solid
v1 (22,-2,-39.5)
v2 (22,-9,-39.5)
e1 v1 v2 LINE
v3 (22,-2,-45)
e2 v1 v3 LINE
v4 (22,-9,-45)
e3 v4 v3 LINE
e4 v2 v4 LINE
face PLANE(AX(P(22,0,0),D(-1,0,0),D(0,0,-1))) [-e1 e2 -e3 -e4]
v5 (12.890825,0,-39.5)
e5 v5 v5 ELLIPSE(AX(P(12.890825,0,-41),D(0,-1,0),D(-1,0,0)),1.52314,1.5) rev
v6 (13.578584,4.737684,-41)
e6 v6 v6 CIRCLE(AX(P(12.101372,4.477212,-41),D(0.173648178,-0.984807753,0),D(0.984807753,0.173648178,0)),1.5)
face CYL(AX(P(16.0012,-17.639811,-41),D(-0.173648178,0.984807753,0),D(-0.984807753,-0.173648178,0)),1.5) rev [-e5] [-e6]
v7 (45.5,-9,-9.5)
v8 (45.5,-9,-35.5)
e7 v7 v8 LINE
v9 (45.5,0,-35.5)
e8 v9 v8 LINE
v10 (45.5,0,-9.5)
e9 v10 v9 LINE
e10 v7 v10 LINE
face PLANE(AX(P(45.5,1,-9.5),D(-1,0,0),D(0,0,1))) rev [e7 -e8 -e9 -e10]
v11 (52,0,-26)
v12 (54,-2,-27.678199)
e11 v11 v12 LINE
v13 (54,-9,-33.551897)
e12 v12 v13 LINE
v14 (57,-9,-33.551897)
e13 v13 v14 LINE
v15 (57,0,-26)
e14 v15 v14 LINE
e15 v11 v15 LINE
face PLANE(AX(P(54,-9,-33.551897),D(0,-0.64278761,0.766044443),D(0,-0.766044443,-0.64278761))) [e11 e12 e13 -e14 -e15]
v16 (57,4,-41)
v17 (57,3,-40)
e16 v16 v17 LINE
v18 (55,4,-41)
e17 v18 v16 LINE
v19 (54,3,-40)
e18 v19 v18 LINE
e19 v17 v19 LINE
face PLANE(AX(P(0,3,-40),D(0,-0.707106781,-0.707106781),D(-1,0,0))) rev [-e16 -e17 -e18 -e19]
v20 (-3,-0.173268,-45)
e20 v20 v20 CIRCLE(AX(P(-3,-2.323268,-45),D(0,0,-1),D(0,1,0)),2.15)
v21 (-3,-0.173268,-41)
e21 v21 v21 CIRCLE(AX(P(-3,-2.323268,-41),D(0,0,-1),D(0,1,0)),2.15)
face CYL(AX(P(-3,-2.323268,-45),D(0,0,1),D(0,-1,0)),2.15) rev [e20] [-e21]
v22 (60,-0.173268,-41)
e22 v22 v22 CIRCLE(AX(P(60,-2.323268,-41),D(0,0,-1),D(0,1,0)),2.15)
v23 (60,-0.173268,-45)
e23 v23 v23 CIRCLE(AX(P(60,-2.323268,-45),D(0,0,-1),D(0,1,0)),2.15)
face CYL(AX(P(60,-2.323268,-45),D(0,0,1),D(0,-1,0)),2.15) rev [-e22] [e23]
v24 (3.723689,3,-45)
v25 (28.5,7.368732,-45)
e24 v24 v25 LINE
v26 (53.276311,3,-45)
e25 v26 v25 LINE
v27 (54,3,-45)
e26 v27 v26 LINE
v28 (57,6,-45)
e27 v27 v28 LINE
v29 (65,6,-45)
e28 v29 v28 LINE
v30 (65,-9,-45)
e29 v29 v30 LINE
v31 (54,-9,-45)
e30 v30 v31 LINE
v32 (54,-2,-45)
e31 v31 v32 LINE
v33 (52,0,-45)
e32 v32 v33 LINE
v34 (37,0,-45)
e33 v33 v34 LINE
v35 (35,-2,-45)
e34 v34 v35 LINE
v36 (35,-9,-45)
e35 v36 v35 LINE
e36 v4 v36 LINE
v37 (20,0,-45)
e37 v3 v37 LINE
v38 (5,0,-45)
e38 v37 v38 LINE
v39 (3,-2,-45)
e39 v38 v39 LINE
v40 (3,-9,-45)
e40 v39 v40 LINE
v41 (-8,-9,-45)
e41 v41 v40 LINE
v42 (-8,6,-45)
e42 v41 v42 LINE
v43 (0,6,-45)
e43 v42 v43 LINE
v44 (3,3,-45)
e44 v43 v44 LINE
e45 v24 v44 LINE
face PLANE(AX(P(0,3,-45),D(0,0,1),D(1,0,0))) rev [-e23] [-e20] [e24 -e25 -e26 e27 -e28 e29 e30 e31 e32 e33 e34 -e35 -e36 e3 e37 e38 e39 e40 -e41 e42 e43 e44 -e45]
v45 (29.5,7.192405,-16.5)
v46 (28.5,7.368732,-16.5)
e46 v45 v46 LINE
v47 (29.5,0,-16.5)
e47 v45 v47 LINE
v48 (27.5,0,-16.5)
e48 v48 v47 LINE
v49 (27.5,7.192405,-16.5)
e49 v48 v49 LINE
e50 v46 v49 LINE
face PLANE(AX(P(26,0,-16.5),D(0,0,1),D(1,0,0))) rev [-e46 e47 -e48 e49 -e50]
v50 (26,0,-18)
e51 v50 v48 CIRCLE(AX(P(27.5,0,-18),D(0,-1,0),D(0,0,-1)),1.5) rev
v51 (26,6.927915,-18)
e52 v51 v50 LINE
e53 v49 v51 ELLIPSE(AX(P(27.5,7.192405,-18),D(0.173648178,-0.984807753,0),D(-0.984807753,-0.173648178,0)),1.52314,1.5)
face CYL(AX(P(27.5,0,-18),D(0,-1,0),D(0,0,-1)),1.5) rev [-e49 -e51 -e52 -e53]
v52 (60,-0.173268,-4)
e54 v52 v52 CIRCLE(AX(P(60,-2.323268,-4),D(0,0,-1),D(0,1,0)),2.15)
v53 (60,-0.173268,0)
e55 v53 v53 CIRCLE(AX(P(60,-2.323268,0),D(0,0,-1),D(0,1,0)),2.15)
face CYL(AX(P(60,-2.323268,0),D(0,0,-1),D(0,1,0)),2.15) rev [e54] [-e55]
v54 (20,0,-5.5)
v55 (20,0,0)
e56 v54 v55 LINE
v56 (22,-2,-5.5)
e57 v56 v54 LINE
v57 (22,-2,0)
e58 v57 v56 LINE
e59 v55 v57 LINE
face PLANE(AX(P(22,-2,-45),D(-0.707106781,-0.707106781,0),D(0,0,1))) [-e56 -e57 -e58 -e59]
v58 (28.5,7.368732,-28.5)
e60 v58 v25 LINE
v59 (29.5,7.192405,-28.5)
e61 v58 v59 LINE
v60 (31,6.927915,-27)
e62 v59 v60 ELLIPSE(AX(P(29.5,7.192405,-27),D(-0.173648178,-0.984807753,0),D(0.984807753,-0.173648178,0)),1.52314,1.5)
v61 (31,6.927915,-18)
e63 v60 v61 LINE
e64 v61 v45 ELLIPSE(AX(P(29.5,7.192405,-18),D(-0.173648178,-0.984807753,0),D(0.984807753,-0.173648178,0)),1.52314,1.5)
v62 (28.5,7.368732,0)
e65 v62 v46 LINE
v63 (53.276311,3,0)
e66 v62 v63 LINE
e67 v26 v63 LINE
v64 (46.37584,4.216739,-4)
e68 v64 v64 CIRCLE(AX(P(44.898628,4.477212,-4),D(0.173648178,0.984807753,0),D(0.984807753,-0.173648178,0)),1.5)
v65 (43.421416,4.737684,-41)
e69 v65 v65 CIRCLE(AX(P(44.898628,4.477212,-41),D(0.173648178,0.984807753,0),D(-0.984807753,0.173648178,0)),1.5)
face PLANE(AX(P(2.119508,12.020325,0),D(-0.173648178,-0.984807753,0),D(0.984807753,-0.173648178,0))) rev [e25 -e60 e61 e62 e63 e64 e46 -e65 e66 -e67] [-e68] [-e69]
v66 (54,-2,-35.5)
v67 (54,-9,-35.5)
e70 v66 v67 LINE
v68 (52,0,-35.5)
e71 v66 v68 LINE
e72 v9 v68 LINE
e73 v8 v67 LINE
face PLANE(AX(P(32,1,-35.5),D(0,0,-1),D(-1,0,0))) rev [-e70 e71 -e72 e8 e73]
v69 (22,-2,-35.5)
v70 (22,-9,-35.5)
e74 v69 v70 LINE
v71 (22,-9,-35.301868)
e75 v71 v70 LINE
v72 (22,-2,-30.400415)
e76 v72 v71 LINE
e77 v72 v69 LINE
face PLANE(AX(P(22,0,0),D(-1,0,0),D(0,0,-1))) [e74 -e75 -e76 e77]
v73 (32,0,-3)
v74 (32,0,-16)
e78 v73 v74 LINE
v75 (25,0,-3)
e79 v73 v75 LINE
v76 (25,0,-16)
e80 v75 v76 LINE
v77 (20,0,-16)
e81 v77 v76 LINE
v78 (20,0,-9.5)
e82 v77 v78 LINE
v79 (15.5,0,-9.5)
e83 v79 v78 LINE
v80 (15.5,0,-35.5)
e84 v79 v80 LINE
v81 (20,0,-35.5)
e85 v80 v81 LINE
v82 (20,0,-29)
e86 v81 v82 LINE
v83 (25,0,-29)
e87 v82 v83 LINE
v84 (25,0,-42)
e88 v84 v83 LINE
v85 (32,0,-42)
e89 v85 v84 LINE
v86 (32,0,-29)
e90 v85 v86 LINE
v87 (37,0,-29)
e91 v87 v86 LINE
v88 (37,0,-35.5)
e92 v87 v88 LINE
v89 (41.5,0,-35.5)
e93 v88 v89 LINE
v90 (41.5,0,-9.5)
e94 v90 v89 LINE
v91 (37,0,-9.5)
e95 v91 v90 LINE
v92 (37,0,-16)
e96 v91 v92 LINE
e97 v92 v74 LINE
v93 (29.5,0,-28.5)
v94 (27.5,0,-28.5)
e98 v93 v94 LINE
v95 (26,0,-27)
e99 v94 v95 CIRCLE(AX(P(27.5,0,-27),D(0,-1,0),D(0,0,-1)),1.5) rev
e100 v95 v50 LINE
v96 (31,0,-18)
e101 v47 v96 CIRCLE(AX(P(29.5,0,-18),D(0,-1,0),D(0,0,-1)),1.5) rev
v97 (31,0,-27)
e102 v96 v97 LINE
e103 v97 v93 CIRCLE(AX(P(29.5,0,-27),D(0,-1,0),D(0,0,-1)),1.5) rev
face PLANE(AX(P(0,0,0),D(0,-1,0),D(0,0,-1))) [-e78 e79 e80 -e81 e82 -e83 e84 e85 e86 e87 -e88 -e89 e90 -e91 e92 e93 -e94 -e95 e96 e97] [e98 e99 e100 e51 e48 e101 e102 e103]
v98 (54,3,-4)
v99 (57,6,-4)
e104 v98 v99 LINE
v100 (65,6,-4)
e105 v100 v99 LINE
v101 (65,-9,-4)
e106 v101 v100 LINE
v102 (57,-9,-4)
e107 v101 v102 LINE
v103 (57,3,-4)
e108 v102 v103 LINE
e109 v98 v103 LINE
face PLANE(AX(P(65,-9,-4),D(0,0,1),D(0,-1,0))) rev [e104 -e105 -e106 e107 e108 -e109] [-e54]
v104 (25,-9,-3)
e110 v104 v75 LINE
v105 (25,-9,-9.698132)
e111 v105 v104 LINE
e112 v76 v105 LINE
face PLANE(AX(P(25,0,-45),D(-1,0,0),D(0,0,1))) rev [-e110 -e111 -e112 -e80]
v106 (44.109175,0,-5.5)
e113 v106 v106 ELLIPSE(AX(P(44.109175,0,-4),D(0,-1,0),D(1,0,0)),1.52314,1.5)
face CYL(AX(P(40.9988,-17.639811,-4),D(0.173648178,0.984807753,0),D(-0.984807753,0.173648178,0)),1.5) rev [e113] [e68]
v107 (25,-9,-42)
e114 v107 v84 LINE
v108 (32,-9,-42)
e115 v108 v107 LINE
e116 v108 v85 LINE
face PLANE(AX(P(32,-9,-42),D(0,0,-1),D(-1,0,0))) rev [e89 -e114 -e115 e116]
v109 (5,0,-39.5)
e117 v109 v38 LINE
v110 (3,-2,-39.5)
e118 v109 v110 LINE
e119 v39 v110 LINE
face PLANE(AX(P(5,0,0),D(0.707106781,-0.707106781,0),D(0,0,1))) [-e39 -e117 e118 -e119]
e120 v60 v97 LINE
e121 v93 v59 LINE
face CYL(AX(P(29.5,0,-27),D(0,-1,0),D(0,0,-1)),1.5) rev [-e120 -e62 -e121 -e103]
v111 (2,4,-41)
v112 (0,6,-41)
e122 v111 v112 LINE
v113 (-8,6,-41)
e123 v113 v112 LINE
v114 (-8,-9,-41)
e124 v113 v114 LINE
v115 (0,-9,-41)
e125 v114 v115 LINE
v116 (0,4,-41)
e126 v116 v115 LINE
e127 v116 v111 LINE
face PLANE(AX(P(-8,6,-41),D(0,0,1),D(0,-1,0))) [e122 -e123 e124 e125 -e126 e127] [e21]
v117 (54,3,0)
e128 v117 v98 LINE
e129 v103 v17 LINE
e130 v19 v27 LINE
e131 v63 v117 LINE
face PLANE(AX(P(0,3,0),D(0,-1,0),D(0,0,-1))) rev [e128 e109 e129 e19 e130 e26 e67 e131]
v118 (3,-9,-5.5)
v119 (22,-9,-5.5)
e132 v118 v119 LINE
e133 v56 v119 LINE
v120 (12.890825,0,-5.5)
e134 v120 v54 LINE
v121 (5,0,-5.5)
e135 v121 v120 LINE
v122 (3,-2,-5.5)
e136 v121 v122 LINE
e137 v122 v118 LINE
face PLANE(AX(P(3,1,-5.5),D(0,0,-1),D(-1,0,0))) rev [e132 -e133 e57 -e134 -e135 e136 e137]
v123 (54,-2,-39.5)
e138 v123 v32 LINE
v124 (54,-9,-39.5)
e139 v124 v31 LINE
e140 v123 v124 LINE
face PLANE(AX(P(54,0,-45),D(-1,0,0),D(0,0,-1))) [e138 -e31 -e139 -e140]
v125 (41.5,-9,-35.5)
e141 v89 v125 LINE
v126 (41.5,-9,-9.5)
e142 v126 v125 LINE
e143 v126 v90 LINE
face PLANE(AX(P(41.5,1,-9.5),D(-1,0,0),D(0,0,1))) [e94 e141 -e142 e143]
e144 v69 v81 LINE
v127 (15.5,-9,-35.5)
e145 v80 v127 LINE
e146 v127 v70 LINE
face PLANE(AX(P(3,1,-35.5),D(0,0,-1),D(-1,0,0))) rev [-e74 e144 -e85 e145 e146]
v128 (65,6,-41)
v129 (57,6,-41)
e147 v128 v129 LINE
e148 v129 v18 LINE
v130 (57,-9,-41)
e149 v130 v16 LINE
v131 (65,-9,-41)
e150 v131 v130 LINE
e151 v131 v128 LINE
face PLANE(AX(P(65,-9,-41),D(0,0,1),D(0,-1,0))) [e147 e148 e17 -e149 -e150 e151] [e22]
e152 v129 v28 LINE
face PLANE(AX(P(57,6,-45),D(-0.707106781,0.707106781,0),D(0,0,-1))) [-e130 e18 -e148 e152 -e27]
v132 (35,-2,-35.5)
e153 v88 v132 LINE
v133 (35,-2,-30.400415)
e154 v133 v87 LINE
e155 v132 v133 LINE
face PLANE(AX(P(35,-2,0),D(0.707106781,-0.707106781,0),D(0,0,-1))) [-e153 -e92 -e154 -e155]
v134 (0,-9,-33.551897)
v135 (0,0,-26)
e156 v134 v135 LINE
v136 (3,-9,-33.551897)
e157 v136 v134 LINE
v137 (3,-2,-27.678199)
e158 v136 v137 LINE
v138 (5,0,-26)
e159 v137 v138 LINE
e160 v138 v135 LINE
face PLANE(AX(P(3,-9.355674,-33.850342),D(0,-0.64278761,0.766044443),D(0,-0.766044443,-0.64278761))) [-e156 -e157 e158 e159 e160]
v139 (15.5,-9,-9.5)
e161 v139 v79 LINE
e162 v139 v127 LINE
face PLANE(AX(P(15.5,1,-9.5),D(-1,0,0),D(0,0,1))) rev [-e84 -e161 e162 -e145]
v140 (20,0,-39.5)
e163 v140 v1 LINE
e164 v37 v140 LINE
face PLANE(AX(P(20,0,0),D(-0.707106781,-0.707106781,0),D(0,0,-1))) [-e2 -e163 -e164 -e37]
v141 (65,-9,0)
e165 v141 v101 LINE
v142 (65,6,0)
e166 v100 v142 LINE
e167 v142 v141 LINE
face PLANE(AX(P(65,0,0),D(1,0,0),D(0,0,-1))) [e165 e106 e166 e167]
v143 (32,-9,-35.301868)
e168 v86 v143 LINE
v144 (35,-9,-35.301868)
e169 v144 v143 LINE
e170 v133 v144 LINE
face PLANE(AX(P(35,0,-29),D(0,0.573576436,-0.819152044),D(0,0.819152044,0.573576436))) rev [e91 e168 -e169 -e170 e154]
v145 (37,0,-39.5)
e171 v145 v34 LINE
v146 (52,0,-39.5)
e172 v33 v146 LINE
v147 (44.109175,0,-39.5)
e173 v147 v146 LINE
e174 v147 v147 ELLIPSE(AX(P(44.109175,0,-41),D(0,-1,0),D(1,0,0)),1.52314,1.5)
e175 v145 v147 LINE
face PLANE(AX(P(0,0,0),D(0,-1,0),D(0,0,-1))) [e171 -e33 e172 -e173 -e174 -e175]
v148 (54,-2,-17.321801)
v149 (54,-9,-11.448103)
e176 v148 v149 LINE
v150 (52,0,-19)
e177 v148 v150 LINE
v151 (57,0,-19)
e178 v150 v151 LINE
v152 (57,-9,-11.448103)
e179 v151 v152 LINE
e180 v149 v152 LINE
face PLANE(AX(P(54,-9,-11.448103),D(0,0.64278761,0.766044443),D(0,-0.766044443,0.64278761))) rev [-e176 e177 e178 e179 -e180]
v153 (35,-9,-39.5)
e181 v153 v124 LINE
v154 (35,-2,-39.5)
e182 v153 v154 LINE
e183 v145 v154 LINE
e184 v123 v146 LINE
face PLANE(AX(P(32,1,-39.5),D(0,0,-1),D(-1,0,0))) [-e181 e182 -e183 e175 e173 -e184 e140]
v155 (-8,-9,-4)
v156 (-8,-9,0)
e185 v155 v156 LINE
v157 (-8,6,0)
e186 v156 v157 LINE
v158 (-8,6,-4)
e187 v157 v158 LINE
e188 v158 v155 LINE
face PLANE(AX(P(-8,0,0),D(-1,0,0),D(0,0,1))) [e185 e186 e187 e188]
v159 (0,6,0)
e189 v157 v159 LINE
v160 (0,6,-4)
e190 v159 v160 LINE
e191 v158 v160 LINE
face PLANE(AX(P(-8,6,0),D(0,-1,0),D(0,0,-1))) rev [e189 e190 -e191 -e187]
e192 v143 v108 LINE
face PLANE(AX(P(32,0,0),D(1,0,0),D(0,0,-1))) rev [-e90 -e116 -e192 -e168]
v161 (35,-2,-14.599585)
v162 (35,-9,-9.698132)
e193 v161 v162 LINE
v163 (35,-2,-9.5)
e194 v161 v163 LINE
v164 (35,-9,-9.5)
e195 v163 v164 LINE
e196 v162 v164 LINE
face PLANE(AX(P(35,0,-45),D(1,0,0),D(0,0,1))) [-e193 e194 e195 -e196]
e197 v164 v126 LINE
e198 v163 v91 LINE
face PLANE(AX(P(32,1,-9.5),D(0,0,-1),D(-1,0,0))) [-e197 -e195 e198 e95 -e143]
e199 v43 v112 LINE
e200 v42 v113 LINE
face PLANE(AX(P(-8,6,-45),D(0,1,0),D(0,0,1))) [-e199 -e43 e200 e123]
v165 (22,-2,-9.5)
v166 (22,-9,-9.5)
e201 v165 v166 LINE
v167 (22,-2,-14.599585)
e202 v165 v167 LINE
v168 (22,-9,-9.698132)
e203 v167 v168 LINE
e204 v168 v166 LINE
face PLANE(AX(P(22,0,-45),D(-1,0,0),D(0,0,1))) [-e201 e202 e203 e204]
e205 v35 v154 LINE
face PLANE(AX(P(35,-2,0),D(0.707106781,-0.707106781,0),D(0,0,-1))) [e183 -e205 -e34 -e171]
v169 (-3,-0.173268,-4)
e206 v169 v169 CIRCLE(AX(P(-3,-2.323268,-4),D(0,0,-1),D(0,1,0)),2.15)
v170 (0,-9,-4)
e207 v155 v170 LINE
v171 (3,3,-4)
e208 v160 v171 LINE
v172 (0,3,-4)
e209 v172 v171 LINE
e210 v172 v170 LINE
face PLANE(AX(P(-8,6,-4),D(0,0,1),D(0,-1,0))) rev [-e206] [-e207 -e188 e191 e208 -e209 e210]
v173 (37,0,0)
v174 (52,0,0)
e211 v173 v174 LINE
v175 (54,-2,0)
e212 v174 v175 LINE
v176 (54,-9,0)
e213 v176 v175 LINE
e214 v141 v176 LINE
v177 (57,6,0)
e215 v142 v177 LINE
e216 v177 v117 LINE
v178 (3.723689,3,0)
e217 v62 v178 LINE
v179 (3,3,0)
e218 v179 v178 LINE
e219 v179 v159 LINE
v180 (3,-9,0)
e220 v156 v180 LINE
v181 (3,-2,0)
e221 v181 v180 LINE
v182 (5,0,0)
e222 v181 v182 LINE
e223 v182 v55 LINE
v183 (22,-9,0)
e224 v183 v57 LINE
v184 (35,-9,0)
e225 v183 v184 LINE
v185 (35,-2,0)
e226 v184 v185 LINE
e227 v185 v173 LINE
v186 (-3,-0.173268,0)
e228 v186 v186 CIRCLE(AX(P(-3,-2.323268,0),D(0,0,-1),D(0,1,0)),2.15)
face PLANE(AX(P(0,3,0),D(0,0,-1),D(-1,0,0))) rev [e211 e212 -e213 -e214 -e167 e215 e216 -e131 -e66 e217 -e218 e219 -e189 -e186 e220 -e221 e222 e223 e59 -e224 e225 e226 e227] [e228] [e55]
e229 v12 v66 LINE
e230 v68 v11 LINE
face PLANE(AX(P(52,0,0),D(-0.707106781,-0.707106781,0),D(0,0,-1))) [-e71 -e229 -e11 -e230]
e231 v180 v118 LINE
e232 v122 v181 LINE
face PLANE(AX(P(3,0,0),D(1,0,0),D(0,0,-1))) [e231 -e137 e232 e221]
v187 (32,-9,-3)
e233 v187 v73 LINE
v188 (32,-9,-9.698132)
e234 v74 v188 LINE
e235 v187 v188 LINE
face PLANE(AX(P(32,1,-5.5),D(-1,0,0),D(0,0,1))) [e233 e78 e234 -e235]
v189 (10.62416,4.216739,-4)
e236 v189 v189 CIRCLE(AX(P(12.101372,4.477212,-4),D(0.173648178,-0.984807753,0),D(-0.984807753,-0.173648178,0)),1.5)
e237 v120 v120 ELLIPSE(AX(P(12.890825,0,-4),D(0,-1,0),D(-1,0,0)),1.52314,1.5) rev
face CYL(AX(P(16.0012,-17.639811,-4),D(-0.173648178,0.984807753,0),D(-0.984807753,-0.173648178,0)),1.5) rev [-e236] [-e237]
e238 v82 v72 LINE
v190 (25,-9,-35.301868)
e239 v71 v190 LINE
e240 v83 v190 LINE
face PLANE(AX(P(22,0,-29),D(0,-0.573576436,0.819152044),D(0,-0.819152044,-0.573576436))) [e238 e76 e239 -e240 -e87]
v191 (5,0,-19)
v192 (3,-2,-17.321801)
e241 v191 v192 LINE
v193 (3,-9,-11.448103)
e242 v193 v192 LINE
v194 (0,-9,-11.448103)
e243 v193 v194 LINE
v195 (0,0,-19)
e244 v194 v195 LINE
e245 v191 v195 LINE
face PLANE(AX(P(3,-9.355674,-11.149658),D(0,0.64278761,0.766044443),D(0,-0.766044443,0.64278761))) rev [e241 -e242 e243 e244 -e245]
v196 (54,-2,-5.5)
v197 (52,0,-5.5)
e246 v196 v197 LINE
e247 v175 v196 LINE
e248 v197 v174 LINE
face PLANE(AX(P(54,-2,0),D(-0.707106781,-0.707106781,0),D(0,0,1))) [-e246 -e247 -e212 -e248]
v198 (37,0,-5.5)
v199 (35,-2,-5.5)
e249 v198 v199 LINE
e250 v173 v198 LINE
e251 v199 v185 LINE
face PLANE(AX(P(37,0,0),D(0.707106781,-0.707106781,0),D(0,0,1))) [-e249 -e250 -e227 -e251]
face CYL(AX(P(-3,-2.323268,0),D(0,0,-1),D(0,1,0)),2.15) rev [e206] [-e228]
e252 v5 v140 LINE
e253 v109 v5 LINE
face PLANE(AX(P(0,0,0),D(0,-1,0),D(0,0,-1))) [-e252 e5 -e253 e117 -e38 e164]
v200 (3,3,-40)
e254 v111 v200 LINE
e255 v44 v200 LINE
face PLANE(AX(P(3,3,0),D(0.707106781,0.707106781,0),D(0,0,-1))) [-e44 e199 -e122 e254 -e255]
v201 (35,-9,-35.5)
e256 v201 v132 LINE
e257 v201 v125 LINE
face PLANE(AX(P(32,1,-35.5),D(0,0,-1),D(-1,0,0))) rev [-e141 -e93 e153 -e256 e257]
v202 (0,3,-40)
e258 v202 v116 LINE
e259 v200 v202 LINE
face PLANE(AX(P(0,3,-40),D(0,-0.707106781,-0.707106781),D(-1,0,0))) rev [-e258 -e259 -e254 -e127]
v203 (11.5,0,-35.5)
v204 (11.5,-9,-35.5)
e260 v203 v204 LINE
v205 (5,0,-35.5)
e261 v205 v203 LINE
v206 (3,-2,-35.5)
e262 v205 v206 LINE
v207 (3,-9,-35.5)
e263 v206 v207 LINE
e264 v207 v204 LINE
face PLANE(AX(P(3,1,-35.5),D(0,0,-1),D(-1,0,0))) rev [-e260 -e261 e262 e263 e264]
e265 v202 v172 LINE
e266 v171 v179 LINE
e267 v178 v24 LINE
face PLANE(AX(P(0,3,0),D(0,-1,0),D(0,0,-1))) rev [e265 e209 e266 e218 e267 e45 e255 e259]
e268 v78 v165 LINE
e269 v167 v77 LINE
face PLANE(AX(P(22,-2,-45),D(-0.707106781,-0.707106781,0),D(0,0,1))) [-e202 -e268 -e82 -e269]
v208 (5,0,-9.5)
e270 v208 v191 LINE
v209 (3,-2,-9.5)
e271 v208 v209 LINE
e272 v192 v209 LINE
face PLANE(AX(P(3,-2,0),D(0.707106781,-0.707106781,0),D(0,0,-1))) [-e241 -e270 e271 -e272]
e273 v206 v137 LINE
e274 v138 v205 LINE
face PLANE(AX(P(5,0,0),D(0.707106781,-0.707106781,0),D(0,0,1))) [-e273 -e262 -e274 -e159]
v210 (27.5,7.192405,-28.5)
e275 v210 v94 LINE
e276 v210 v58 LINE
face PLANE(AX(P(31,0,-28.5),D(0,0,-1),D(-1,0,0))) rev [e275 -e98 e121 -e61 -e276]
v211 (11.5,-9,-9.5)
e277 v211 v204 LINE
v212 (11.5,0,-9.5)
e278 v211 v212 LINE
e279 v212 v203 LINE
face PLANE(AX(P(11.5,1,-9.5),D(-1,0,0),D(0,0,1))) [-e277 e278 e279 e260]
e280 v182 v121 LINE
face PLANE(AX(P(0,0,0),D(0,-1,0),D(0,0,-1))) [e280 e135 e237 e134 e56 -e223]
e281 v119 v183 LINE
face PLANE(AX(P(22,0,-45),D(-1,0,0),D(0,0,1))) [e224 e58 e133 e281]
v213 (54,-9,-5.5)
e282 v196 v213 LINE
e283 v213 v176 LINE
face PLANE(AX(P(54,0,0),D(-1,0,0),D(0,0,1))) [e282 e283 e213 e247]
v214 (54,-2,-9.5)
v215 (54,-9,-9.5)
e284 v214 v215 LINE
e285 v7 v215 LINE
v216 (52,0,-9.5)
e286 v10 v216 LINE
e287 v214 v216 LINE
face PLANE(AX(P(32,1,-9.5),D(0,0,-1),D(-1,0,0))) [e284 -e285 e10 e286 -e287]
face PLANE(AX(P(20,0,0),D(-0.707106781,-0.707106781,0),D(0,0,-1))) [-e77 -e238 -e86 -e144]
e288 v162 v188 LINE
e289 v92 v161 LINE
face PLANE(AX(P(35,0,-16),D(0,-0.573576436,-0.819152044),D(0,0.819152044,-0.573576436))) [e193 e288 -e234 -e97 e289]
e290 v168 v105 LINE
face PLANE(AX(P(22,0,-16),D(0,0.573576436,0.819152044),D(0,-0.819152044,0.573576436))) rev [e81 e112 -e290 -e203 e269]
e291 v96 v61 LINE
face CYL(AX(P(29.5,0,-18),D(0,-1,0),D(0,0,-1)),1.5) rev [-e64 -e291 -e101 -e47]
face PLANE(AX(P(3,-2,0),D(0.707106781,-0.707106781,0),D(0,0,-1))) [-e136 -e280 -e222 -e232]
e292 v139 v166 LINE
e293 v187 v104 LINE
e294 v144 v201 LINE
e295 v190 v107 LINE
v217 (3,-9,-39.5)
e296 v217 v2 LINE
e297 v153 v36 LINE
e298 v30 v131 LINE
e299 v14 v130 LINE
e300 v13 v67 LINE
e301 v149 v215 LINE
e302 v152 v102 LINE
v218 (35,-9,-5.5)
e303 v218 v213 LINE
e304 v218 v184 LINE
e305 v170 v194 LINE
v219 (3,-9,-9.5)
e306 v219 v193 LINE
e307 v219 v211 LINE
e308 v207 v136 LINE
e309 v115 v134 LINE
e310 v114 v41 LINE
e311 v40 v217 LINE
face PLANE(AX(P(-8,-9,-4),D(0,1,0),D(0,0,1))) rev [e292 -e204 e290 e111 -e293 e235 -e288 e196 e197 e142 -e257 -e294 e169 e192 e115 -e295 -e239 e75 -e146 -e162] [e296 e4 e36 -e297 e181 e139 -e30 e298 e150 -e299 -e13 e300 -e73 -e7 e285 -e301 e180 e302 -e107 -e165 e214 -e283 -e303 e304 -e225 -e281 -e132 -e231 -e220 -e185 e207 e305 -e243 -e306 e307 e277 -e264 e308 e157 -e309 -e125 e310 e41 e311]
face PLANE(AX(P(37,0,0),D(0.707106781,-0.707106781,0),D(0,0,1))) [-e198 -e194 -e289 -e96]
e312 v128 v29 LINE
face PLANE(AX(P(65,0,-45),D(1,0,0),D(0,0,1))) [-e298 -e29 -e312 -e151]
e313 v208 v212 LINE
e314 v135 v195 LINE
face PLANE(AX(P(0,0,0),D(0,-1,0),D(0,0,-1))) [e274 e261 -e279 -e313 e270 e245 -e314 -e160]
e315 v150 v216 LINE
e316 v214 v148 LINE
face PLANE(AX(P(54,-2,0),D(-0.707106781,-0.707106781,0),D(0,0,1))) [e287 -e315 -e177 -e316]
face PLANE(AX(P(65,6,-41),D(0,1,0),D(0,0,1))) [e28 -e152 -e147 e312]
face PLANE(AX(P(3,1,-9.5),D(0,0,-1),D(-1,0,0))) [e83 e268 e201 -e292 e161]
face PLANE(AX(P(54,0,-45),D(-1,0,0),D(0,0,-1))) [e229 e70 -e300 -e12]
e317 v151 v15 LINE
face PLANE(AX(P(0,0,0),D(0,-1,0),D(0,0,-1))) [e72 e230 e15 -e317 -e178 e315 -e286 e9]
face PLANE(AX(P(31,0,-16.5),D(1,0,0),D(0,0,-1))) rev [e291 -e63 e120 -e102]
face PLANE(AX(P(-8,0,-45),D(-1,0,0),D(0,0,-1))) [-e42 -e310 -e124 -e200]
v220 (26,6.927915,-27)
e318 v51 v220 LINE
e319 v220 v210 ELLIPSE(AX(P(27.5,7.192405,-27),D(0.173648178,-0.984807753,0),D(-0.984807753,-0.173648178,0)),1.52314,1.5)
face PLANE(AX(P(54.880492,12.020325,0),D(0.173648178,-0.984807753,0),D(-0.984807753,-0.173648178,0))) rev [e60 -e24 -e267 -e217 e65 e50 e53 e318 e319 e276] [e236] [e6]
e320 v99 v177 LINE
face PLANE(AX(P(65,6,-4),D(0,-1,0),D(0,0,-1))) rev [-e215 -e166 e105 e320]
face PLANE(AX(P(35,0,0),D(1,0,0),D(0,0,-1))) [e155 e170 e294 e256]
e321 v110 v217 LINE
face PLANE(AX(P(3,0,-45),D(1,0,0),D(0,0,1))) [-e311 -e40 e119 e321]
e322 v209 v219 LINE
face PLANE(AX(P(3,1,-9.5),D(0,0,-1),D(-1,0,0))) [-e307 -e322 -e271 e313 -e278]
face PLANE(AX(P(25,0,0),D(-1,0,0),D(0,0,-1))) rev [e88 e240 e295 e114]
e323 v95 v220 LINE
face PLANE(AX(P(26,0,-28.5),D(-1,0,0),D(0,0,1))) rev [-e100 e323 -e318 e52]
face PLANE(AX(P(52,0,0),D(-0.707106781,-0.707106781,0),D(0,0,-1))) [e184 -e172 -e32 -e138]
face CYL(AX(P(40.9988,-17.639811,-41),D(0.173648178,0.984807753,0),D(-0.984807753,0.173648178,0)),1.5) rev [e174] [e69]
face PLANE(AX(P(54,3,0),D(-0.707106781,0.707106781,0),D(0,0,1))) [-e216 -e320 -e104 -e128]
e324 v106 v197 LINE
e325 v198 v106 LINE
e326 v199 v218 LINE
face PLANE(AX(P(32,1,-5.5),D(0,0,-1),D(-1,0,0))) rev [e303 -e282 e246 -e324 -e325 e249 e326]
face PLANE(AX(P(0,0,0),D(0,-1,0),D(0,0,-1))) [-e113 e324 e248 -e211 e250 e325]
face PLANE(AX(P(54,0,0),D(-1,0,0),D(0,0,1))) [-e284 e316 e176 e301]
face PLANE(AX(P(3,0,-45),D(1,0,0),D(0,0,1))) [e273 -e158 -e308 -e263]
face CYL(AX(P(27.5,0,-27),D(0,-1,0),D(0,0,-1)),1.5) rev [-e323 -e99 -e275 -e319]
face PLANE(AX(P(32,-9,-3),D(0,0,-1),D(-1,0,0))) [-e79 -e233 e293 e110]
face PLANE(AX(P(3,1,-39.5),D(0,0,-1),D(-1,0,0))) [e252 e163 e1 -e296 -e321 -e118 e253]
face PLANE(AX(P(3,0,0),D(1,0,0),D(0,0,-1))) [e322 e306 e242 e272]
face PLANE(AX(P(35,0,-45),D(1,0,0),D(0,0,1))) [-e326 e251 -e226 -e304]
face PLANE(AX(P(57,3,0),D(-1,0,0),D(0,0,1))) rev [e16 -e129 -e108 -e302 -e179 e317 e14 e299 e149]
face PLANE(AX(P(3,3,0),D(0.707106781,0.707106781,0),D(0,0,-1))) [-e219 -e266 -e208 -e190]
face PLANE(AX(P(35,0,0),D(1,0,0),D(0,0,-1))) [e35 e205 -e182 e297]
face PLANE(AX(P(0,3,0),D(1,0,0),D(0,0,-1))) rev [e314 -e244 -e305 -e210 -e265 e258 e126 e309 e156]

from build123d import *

# Parameters (mm, degrees)
SKETCH_1_W                 = 57
SKETCH_1_H                 = 45
EXTRUDE_1_DEPTH            = 3
SKETCH_2_W                 = 4
SKETCH_2_H                 = 15
EXTRUDE_2_DEPTH            = 8
SKETCH_3_W                 = 4
SKETCH_3_H                 = 15
EXTRUDE_3_DEPTH            = 8
EXTRUDE_4_DEPTH            = 3
EXTRUDE_5_DEPTH            = 3
CHAMFER_1_SIZE             = 3
SKETCH_6_R                 = 2.15
CUT_EXTRUDE_1_DEPTH        = 4
SKETCH_8_W                 = 8
SKETCH_8_H                 = 3
EXTRUDE_6_DEPTH            = 9
EXTRUDE_7_DEPTH            = 3
SKETCH_12_W                = 5
SKETCH_12_H                = 12
CUT_EXTRUDE_4_DEPTH        = 3
FILLET_1_R                 = 1.5
EXTRUDE_9_REACH            = 82.13
SKETCH_15_W                = 45
SKETCH_15_H                = 17.726539555
SKETCH_16_R                = 1.5
CUT_EXTRUDE_5_DEPTH        = 81.129959324
CHAMFER_1_OF_MIRROR_2_SIZE = 3
CHAMFER_2_SIZE             = 1
CHAMFER_3_SIZE             = 2
DELETE_START               = -45
DELETE_FACE_1_DEPTH        = 45
DELETE_FACE_1_2_DEPTH      = 18
DELETE_START_2             = -18
DELETE_FACE_1_3_DEPTH      = 18
DELETE_START_3             = 3
DELETE_FACE_1_4_DEPTH      = 5
SKETCH_20_W                = 22
SKETCH_20_H                = 4
EXTRUDE_2_2_DEPTH          = 10
MIRROR_4_COPY_1_DEPTH      = 3
SKETCH_21_W                = 4
SKETCH_21_H                = 26
EXTRUDE_3_2_DEPTH          = 10
CHAMFER_4_SIZE             = 2


with BuildPart() as part:
    # 草图1 → 凸台-拉伸1 (new body)
    with BuildSketch(Plane(origin=(0, 0, 0), x_dir=(1, 0, 0), z_dir=(0, 1, 0))):
        with Locations((28.5, 22.5)):
            Rectangle(SKETCH_1_W, SKETCH_1_H)
    extrude(amount=EXTRUDE_1_DEPTH)

    # 草图2 → Extrude 2 (add)
    with BuildSketch(Plane.ZY):
        with Locations((-2, -1.5)):
            Rectangle(SKETCH_2_W, SKETCH_2_H)
    extrude_2 = extrude(amount=EXTRUDE_2_DEPTH)

    # 草图3 → Extrude 3 (add)
    with BuildSketch(Plane(origin=(57, 0, 0), x_dir=(0, 0, -1), z_dir=(1, 0, 0))):
        with Locations((2, -1.5)):
            Rectangle(SKETCH_3_W, SKETCH_3_H)
    extrude_3 = extrude(amount=EXTRUDE_3_DEPTH)

    # 草图4 → 凸台-拉伸4 (add)
    with BuildSketch(Plane.ZY.offset(-57)):
        Polygon((-11.448103319, -9), (-19, 0), (0, 0), (0, -9), align=None)
    extrude_4 = extrude(amount=EXTRUDE_4_DEPTH)

    # 草图5 → 凸台-拉伸5 (add)
    with BuildSketch(Plane(origin=(0, 0, 0), x_dir=(0, 0, -1), z_dir=(1, 0, 0))):
        Polygon((19, 0), (0, 0), (0, -9), (11.448103319, -9), align=None)
    extrude_5 = extrude(amount=EXTRUDE_5_DEPTH)

    # 倒角1
    chamfer_1_edges = [part.edges().sort_by_distance(p)[0] for p in [
        (0, 3, -2),
        (57, 3, -2),
    ]]
    chamfer(chamfer_1_edges, length=CHAMFER_1_SIZE - 0.0001)  # a hair under: the kernel refuses the full size

    # 草图6 → 切除-拉伸1 (cut)
    with BuildSketch(Plane(origin=(0, 0, -4), x_dir=(-1, 0, 0), z_dir=(0, 0, -1))):
        with Locations(Location((3, -2.323268139, 0), (0, 0, 90))):
            Circle(SKETCH_6_R)
        with Locations(Location((-60, -2.323268139, 0), (0, 0, 90))):
            Circle(SKETCH_6_R)
    cut_extrude_1 = extrude(amount=-CUT_EXTRUDE_1_DEPTH, mode=Mode.SUBTRACT)

    # 草图8 → 凸台-拉伸6 (add)
    with BuildSketch(Plane.XZ):
        with Locations((28, -43.5)):
            Rectangle(SKETCH_8_W, SKETCH_8_H)
    extrude_6 = extrude(amount=EXTRUDE_6_DEPTH)

    # 草图9 → 凸台-拉伸7 (add)
    with BuildSketch(Plane(origin=(32, 0, 0), x_dir=(0, 0, -1), z_dir=(1, 0, 0))):
        Polygon((45, 0), (29, 0), (35.301867844, -9), (45, -9), align=None)
    extrude_7 = extrude(amount=EXTRUDE_7_DEPTH)

    # 草图12 → 切除-拉伸4 (cut)
    with BuildSketch(Plane(origin=(0, 3, 0), x_dir=(1, 0, 0), z_dir=(0, 1, 0))):
        with Locations((28.5, 22.5)):
            Rectangle(SKETCH_12_W, SKETCH_12_H)
    extrude(amount=-CUT_EXTRUDE_4_DEPTH, mode=Mode.SUBTRACT)

    # 圆角1
    fillet_1_edges = [part.edges().sort_by_distance(p)[0] for p in [
        (26, 1.5, -28.5),
        (31, 1.5, -28.5),
        (31, 1.5, -16.5),
        (26, 1.5, -16.5),
    ]]
    fillet(fillet_1_edges, radius=FILLET_1_R)

    # 草图15 → 凸台-拉伸9 (add, up to next)
    with BuildSketch(Plane(origin=(2.119507574, 12.02032477, 0), x_dir=(0, 0, 1), z_dir=(0.17364817766693066, 0.9848077530122081, 0)), mode=Mode.PRIVATE) as extrude_9_sk1:
        with Locations((-22.5, 43.795404353)):
            Rectangle(SKETCH_15_W, SKETCH_15_H)
    extrude_9_tool1 = extrude(extrude_9_sk1.sketch, amount=-EXTRUDE_9_REACH, mode=Mode.PRIVATE) - part.part
    extrude_9 = extrude_9_tool1.solids().sort_by_distance((45.249561, 4.415333, -22.5))[0]
    add(extrude_9)

    # 草图16 → 切除-拉伸5 (cut, through all)
    with BuildSketch(Plane(origin=(2.119507574, 12.02032477, 0), x_dir=(0.9848077530122081, -0.17364817766693064, 0), z_dir=(0.17364817766693064, 0.9848077530122081, 0))):
        with Locations(Location((43.439057305, 41, 0), (0, 0, 180))):
            Circle(SKETCH_16_R)
        with Locations((43.439057305, 4)):
            Circle(SKETCH_16_R)
    cut_extrude_5 = extrude(amount=-CUT_EXTRUDE_5_DEPTH, mode=Mode.SUBTRACT)

    # 镜向1: 凸台-拉伸9, 切除-拉伸5 across plane
    add(extrude_9.mirror(Plane(origin=(28.5, 0, 0), x_dir=(0, 0, 1), z_dir=(1, 0, 0))))
    add(cut_extrude_5.mirror(Plane(origin=(28.5, 0, 0), x_dir=(0, 0, 1), z_dir=(1, 0, 0))), mode=Mode.SUBTRACT)

    # 镜向2: Extrude 2, Extrude 3, 凸台-拉伸4, 凸台-拉伸5, 切除-拉伸1 across plane
    add(extrude_2.mirror(Plane.XY.offset(-22.5)))
    add(extrude_3.mirror(Plane.XY.offset(-22.5)))
    add(extrude_4.mirror(Plane.XY.offset(-22.5)))
    add(extrude_5.mirror(Plane.XY.offset(-22.5)))
    add(cut_extrude_1.mirror(Plane.XY.offset(-22.5)), mode=Mode.SUBTRACT)

    # 倒角1 of 镜向2
    chamfer_1_of_mirror_2_edges = [part.edges().sort_by_distance(p)[0] for p in [
        (0, 3, -43),
        (57, 3, -43),
    ]]
    chamfer(chamfer_1_of_mirror_2_edges, length=CHAMFER_1_OF_MIRROR_2_SIZE - 0.0001)  # a hair under: the kernel refuses the full size

    # 倒角2
    chamfer_2_edges = [part.edges().sort_by_distance(p)[0] for p in [
        (55.50005, 3, -41),
        (1.49995, 3, -41),
    ]]
    chamfer(chamfer_2_edges, length=CHAMFER_2_SIZE)

    # 倒角3
    chamfer_3_edges = [part.edges().sort_by_distance(p)[0] for p in [
        (35, 0, -37),
        (54, 0, -35.5),
        (3, 0, -35.5),
        (54, 0, -9.5),
        (3, 0, -9.5),
    ]]
    chamfer(chamfer_3_edges, length=CHAMFER_3_SIZE)

    # Delete Face 1: read off the stored shape, not the designer's step
    # Delete Face 1 outline → Delete Face 1 (add)
    with BuildSketch(Plane.XY.offset(DELETE_START)):
        Polygon((26, 6.927914739), (20.479055467, 5.954423259), (21, 3), (26, 3), align=None)
        Polygon((36.520944533, 5.954423259), (31, 6.927914739), (31, 3), (36, 3), align=None)
    extrude(amount=DELETE_FACE_1_DEPTH)

    # Delete Face 1 2 outline → Delete Face 1 2 (add)
    with BuildSketch(Plane.XY.offset(DELETE_START)):
        Polygon((28.5, 7.368732191), (26, 6.927914739), (26, 3), (31, 3), (31, 6.927914739), align=None)
    extrude(amount=DELETE_FACE_1_2_DEPTH)

    # Delete Face 1 3 outline → Delete Face 1 3 (add)
    with BuildSketch(Plane.XY.offset(DELETE_START_2)):
        Polygon((28.5, 7.368732191), (26, 6.927914739), (26, 3), (31, 3), (31, 6.927914739), align=None)
    extrude(amount=DELETE_FACE_1_3_DEPTH)

    # Delete Face 1 4 outline → Delete Face 1 4 (cut)
    with BuildSketch(Plane(origin=(0, 0, 0), x_dir=(1, 0, 0), z_dir=(0, 1, 0)).offset(DELETE_START_3)):
        with BuildLine():
            ThreePointArc((31, 27), (30.560660172, 28.060660172), (29.5, 28.5))
            Line((29.5, 28.5), (27.5, 28.5))
            ThreePointArc((27.5, 28.5), (26.439339828, 28.060660172), (26, 27))
            Line((26, 27), (31, 27))
        make_face()
        with BuildLine():
            ThreePointArc((26, 18), (26.439339828, 16.939339828), (27.5, 16.5))
            Line((27.5, 16.5), (29.5, 16.5))
            ThreePointArc((29.5, 16.5), (30.560660172, 16.939339828), (31, 18))
            Line((31, 18), (26, 18))
        make_face()
    extrude(amount=DELETE_FACE_1_4_DEPTH, mode=Mode.SUBTRACT)

    # 镜向3: 凸台-拉伸7 across plane
    add(extrude_7.mirror(Plane.ZY.offset(-28.5)))

    # 草图20 → Extrude 2 2 (add)
    with BuildSketch(Plane.XZ.offset(9)):
        with Locations((14, -37.5)):
            Rectangle(SKETCH_20_W, SKETCH_20_H)
        with Locations((43, -37.5)):
            Rectangle(SKETCH_20_W, SKETCH_20_H)
    extrude_2_2 = extrude(amount=-EXTRUDE_2_2_DEPTH)

    # 镜向4: 凸台-拉伸6, 凸台-拉伸7, Extrude 2 2 across plane
    add(extrude_6.mirror(Plane.XY.offset(-22.5)))
    add(extrude_7.mirror(Plane.XY.offset(-22.5)))
    add(extrude_2_2.mirror(Plane.XY.offset(-22.5)))

    # 镜向4 copy 1 sketch → 镜向4 copy 1 (add)
    with BuildSketch(Plane(origin=(25, 0, -45), x_dir=(0, 0, 1), z_dir=(-1, 0, 0))):
        Polygon((45, 0), (29, 0), (35.301867844, -9), (45, -9), align=None)
    extrude(amount=MIRROR_4_COPY_1_DEPTH)

    # 草图21 → Extrude 3 2 (add)
    with BuildSketch(Plane.XZ.offset(9)):
        with Locations((13.5, -22.5)):
            Rectangle(SKETCH_21_W, SKETCH_21_H)
    extrude_3_2 = extrude(amount=-EXTRUDE_3_2_DEPTH)

    # 镜向5: Extrude 3 2 across plane
    add(extrude_3_2.mirror(Plane.ZY.offset(-28.5)))

    # 倒角4
    chamfer_4_edges = [part.edges().sort_by_distance(p)[0] for p in [
        (22, 0, -42.25),
        (22, 0, -32.25),
        (22, 0, -2.75),
        (22, 0, -12.75),
        (35, 0, -2.75),
        (35, 0, -12.75),
    ]]
    chamfer(chamfer_4_edges, length=CHAMFER_4_SIZE)


solid = part.part
